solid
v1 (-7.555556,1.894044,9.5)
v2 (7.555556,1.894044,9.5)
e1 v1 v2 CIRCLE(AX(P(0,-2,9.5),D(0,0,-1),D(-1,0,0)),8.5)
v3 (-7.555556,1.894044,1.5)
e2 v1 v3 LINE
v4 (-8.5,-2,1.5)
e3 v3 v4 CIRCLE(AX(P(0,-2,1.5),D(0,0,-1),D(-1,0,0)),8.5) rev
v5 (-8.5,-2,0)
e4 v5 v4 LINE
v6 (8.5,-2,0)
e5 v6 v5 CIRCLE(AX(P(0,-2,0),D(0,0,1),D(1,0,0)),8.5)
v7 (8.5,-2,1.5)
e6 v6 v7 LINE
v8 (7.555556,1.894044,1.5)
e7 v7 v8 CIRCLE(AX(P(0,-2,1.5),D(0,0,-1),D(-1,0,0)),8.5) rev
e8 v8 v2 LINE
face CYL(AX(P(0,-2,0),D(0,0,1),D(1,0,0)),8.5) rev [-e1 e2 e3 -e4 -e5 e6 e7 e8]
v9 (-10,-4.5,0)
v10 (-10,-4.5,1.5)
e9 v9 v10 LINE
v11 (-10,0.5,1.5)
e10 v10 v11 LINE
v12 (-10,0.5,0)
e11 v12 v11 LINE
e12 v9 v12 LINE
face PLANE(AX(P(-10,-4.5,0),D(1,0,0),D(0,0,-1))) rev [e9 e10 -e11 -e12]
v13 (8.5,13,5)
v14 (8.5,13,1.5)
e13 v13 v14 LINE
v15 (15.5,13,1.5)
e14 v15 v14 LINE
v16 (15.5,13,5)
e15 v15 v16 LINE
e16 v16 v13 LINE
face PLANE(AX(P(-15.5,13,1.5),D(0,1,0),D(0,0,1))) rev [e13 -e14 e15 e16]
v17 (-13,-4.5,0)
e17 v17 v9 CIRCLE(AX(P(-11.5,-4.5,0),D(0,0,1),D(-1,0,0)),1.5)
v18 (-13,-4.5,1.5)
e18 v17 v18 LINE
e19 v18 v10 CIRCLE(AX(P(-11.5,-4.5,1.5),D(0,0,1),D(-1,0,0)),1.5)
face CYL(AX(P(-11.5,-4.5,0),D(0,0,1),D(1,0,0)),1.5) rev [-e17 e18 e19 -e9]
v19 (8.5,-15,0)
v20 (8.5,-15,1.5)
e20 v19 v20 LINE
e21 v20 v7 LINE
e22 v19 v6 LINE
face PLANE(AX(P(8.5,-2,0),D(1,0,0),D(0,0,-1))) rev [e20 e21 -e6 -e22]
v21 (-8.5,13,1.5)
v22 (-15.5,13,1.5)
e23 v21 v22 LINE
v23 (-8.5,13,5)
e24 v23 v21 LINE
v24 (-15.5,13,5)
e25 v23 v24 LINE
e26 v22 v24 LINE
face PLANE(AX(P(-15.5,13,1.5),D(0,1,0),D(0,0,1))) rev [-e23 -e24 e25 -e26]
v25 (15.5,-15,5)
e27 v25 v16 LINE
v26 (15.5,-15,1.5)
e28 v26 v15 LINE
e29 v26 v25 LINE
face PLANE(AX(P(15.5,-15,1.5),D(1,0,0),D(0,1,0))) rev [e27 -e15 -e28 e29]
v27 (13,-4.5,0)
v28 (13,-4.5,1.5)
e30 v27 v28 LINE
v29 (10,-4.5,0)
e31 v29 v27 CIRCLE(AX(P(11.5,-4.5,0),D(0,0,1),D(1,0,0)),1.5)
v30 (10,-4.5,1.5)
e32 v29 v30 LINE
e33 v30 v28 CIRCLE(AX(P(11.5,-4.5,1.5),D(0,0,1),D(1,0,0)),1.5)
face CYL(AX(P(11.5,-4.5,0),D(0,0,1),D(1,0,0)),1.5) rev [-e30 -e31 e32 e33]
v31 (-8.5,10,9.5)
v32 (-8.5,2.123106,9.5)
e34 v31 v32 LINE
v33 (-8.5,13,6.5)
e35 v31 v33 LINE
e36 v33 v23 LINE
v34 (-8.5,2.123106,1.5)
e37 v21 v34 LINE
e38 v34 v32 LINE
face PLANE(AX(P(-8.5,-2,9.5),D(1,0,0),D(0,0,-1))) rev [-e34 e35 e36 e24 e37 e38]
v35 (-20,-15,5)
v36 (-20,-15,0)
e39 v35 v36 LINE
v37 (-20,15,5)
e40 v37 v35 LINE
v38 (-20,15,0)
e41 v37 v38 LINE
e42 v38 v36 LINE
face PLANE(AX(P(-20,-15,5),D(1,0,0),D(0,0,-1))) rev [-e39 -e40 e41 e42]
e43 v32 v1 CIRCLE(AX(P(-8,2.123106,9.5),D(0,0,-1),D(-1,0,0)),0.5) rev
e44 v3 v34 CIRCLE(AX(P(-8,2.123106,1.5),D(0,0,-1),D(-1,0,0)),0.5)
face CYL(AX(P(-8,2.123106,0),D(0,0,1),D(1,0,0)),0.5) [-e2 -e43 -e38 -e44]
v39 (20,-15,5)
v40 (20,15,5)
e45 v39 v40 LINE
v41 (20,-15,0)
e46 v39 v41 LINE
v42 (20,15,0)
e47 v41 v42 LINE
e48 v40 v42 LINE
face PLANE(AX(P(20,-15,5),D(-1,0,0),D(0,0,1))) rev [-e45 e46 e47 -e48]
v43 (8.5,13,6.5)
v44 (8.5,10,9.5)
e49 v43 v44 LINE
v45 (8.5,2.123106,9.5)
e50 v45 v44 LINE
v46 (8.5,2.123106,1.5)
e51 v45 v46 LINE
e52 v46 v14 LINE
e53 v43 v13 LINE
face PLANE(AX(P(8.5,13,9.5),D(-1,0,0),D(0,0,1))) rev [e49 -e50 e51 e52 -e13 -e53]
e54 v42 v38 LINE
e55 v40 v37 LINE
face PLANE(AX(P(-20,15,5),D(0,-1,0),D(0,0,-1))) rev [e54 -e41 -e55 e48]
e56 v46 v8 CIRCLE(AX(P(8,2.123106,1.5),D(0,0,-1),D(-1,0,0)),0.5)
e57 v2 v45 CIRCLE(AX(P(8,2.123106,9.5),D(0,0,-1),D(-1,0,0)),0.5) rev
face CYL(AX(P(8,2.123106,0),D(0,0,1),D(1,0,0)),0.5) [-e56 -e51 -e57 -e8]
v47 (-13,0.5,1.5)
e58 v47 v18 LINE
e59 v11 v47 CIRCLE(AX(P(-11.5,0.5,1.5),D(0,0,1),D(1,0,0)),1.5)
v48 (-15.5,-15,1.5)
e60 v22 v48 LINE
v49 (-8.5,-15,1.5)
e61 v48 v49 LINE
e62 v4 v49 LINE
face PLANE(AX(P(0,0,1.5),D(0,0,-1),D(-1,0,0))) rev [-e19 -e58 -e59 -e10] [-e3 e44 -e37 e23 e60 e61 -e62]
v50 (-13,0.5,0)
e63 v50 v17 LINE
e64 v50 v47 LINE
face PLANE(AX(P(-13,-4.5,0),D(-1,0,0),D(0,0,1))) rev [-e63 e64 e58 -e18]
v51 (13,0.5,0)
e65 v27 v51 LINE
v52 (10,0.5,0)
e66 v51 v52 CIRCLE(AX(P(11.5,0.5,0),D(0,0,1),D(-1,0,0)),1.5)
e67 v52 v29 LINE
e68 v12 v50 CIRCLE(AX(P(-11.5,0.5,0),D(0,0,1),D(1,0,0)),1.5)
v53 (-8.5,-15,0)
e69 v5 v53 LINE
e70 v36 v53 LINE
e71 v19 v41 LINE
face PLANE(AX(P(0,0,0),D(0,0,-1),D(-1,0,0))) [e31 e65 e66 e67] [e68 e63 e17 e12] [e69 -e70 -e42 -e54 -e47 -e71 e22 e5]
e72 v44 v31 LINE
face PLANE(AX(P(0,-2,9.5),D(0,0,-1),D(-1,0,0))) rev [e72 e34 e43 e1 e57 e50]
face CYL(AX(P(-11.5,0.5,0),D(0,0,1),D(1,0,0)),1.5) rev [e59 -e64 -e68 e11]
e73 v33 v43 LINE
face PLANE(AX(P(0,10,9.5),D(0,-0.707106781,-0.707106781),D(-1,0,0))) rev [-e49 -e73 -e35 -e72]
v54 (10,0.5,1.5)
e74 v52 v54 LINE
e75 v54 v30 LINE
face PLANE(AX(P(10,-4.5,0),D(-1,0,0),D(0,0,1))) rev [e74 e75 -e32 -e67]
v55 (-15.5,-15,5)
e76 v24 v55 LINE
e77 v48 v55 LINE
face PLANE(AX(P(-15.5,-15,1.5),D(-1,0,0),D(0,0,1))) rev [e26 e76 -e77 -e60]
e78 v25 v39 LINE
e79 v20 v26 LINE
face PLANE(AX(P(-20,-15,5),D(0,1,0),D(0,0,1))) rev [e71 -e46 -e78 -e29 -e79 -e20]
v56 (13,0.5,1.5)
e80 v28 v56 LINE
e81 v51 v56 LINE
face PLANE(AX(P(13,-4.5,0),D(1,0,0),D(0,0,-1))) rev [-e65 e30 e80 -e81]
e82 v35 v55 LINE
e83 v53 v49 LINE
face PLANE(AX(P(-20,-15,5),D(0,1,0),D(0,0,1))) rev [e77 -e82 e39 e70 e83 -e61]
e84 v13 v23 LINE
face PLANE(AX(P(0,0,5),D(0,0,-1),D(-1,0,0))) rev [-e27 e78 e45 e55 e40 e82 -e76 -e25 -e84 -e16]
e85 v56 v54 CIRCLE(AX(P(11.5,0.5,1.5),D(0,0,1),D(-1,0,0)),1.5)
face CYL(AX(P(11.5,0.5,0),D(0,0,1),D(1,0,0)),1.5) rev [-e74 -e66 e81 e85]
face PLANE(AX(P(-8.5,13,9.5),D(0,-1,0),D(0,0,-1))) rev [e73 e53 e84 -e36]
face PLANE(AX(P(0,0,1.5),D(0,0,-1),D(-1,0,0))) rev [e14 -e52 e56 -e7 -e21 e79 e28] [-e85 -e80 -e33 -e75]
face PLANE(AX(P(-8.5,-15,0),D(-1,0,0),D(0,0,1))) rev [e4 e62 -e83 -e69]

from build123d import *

# Parameters (mm, degrees)
SKETCH_1_W          = 40
SKETCH_1_H          = 30
EXTRUDE_1_DEPTH     = 5
SKETCH_2_W          = 31
SKETCH_2_H          = 28
CUT_EXTRUDE_1_DEPTH = 3.5
CUT_EXTRUDE_2_DEPTH = 26.243811123
EXTRUDE_START       = 8
EXTRUDE_2_DEPTH     = 8
FILLET_START        = 1.5
FILLET_1_DEPTH      = 8.5
CHAMFER_1_SIZE      = 3


with BuildPart() as part:
    # ｽｹｯﾁ1 → ﾎﾞｽ - 押し出し1 (new body)
    with BuildSketch(Plane.XY):
        Rectangle(SKETCH_1_W, SKETCH_1_H)
    extrude(amount=EXTRUDE_1_DEPTH)

    # ｽｹｯﾁ2 → ｶｯﾄ - 押し出し1 (cut)
    with BuildSketch(Plane.XY.offset(5)):
        with Locations((0, -1)):
            Rectangle(SKETCH_2_W, SKETCH_2_H)
    extrude(amount=-CUT_EXTRUDE_1_DEPTH, mode=Mode.SUBTRACT)

    # ｽｹｯﾁ3 → ｶｯﾄ - 押し出し2 (cut, through all)
    with BuildSketch(Plane.XY.offset(1.5)):
        with BuildLine():
            Line((8.5, -2), (8.5, -15))
            Line((8.5, -15), (-8.5, -15))
            Line((-8.5, -15), (-8.5, -2))
            ThreePointArc((-8.5, -2), (0, 6.5), (8.5, -2))
        make_face()
        with BuildLine():
            Line((13, -4.5), (13, 0.5))
            ThreePointArc((13, 0.5), (11.5, 2), (10, 0.5))
            Line((10, 0.5), (10, -4.5))
            ThreePointArc((10, -4.5), (11.5, -6), (13, -4.5))
        make_face()
        with BuildLine():
            Line((-13, -4.5), (-13, 0.5))
            ThreePointArc((-13, 0.5), (-11.5, 2), (-10, 0.5))
            Line((-10, 0.5), (-10, -4.5))
            ThreePointArc((-10, -4.5), (-11.5, -6), (-13, -4.5))
        make_face()
    extrude(amount=-CUT_EXTRUDE_2_DEPTH, mode=Mode.SUBTRACT)

    # ｽｹｯﾁ4 → ﾎﾞｽ - 押し出し2 (add)
    with BuildSketch(Plane.XY.offset(1.5).offset(EXTRUDE_START)):
        with BuildLine():
            Line((-8.5, -2), (-8.5, 13))
            Line((-8.5, 13), (8.5, 13))
            Line((8.5, 13), (8.5, -2))
            ThreePointArc((8.5, -2), (0, 6.5), (-8.5, -2))
        make_face()
    extrude(amount=-EXTRUDE_2_DEPTH)

    # ﾌｨﾚｯﾄ1: read off the stored shape, not the designer's step
    # ﾌｨﾚｯﾄ1 outline → ﾌｨﾚｯﾄ1 (cut)
    with BuildSketch(Plane.XY.offset(FILLET_START)):
        with BuildLine():
            ThreePointArc((8.5, 2.123105626), (8.117851131, 1.637192968), (7.555555556, 1.894044202))
            ThreePointArc((7.555555556, 1.894044202), (8.260515184, 0.003469213), (8.5, -2))
            Line((8.5, -2), (8.5, 2.123105626))
        make_face()
        with BuildLine():
            ThreePointArc((-7.555555556, 1.894044202), (-8.117851131, 1.637192968), (-8.5, 2.123105626))
            Line((-8.5, 2.123105626), (-8.5, -2))
            ThreePointArc((-8.5, -2), (-8.260515184, 0.003469213), (-7.555555556, 1.894044202))
        make_face()
    extrude(amount=FILLET_1_DEPTH, mode=Mode.SUBTRACT)

    # 面取り1
    chamfer_1_edges = [part.edges().sort_by_distance(p)[0] for p in [
        (0, 13, 9.5),
    ]]
    chamfer(chamfer_1_edges, length=CHAMFER_1_SIZE)


solid = part.part
